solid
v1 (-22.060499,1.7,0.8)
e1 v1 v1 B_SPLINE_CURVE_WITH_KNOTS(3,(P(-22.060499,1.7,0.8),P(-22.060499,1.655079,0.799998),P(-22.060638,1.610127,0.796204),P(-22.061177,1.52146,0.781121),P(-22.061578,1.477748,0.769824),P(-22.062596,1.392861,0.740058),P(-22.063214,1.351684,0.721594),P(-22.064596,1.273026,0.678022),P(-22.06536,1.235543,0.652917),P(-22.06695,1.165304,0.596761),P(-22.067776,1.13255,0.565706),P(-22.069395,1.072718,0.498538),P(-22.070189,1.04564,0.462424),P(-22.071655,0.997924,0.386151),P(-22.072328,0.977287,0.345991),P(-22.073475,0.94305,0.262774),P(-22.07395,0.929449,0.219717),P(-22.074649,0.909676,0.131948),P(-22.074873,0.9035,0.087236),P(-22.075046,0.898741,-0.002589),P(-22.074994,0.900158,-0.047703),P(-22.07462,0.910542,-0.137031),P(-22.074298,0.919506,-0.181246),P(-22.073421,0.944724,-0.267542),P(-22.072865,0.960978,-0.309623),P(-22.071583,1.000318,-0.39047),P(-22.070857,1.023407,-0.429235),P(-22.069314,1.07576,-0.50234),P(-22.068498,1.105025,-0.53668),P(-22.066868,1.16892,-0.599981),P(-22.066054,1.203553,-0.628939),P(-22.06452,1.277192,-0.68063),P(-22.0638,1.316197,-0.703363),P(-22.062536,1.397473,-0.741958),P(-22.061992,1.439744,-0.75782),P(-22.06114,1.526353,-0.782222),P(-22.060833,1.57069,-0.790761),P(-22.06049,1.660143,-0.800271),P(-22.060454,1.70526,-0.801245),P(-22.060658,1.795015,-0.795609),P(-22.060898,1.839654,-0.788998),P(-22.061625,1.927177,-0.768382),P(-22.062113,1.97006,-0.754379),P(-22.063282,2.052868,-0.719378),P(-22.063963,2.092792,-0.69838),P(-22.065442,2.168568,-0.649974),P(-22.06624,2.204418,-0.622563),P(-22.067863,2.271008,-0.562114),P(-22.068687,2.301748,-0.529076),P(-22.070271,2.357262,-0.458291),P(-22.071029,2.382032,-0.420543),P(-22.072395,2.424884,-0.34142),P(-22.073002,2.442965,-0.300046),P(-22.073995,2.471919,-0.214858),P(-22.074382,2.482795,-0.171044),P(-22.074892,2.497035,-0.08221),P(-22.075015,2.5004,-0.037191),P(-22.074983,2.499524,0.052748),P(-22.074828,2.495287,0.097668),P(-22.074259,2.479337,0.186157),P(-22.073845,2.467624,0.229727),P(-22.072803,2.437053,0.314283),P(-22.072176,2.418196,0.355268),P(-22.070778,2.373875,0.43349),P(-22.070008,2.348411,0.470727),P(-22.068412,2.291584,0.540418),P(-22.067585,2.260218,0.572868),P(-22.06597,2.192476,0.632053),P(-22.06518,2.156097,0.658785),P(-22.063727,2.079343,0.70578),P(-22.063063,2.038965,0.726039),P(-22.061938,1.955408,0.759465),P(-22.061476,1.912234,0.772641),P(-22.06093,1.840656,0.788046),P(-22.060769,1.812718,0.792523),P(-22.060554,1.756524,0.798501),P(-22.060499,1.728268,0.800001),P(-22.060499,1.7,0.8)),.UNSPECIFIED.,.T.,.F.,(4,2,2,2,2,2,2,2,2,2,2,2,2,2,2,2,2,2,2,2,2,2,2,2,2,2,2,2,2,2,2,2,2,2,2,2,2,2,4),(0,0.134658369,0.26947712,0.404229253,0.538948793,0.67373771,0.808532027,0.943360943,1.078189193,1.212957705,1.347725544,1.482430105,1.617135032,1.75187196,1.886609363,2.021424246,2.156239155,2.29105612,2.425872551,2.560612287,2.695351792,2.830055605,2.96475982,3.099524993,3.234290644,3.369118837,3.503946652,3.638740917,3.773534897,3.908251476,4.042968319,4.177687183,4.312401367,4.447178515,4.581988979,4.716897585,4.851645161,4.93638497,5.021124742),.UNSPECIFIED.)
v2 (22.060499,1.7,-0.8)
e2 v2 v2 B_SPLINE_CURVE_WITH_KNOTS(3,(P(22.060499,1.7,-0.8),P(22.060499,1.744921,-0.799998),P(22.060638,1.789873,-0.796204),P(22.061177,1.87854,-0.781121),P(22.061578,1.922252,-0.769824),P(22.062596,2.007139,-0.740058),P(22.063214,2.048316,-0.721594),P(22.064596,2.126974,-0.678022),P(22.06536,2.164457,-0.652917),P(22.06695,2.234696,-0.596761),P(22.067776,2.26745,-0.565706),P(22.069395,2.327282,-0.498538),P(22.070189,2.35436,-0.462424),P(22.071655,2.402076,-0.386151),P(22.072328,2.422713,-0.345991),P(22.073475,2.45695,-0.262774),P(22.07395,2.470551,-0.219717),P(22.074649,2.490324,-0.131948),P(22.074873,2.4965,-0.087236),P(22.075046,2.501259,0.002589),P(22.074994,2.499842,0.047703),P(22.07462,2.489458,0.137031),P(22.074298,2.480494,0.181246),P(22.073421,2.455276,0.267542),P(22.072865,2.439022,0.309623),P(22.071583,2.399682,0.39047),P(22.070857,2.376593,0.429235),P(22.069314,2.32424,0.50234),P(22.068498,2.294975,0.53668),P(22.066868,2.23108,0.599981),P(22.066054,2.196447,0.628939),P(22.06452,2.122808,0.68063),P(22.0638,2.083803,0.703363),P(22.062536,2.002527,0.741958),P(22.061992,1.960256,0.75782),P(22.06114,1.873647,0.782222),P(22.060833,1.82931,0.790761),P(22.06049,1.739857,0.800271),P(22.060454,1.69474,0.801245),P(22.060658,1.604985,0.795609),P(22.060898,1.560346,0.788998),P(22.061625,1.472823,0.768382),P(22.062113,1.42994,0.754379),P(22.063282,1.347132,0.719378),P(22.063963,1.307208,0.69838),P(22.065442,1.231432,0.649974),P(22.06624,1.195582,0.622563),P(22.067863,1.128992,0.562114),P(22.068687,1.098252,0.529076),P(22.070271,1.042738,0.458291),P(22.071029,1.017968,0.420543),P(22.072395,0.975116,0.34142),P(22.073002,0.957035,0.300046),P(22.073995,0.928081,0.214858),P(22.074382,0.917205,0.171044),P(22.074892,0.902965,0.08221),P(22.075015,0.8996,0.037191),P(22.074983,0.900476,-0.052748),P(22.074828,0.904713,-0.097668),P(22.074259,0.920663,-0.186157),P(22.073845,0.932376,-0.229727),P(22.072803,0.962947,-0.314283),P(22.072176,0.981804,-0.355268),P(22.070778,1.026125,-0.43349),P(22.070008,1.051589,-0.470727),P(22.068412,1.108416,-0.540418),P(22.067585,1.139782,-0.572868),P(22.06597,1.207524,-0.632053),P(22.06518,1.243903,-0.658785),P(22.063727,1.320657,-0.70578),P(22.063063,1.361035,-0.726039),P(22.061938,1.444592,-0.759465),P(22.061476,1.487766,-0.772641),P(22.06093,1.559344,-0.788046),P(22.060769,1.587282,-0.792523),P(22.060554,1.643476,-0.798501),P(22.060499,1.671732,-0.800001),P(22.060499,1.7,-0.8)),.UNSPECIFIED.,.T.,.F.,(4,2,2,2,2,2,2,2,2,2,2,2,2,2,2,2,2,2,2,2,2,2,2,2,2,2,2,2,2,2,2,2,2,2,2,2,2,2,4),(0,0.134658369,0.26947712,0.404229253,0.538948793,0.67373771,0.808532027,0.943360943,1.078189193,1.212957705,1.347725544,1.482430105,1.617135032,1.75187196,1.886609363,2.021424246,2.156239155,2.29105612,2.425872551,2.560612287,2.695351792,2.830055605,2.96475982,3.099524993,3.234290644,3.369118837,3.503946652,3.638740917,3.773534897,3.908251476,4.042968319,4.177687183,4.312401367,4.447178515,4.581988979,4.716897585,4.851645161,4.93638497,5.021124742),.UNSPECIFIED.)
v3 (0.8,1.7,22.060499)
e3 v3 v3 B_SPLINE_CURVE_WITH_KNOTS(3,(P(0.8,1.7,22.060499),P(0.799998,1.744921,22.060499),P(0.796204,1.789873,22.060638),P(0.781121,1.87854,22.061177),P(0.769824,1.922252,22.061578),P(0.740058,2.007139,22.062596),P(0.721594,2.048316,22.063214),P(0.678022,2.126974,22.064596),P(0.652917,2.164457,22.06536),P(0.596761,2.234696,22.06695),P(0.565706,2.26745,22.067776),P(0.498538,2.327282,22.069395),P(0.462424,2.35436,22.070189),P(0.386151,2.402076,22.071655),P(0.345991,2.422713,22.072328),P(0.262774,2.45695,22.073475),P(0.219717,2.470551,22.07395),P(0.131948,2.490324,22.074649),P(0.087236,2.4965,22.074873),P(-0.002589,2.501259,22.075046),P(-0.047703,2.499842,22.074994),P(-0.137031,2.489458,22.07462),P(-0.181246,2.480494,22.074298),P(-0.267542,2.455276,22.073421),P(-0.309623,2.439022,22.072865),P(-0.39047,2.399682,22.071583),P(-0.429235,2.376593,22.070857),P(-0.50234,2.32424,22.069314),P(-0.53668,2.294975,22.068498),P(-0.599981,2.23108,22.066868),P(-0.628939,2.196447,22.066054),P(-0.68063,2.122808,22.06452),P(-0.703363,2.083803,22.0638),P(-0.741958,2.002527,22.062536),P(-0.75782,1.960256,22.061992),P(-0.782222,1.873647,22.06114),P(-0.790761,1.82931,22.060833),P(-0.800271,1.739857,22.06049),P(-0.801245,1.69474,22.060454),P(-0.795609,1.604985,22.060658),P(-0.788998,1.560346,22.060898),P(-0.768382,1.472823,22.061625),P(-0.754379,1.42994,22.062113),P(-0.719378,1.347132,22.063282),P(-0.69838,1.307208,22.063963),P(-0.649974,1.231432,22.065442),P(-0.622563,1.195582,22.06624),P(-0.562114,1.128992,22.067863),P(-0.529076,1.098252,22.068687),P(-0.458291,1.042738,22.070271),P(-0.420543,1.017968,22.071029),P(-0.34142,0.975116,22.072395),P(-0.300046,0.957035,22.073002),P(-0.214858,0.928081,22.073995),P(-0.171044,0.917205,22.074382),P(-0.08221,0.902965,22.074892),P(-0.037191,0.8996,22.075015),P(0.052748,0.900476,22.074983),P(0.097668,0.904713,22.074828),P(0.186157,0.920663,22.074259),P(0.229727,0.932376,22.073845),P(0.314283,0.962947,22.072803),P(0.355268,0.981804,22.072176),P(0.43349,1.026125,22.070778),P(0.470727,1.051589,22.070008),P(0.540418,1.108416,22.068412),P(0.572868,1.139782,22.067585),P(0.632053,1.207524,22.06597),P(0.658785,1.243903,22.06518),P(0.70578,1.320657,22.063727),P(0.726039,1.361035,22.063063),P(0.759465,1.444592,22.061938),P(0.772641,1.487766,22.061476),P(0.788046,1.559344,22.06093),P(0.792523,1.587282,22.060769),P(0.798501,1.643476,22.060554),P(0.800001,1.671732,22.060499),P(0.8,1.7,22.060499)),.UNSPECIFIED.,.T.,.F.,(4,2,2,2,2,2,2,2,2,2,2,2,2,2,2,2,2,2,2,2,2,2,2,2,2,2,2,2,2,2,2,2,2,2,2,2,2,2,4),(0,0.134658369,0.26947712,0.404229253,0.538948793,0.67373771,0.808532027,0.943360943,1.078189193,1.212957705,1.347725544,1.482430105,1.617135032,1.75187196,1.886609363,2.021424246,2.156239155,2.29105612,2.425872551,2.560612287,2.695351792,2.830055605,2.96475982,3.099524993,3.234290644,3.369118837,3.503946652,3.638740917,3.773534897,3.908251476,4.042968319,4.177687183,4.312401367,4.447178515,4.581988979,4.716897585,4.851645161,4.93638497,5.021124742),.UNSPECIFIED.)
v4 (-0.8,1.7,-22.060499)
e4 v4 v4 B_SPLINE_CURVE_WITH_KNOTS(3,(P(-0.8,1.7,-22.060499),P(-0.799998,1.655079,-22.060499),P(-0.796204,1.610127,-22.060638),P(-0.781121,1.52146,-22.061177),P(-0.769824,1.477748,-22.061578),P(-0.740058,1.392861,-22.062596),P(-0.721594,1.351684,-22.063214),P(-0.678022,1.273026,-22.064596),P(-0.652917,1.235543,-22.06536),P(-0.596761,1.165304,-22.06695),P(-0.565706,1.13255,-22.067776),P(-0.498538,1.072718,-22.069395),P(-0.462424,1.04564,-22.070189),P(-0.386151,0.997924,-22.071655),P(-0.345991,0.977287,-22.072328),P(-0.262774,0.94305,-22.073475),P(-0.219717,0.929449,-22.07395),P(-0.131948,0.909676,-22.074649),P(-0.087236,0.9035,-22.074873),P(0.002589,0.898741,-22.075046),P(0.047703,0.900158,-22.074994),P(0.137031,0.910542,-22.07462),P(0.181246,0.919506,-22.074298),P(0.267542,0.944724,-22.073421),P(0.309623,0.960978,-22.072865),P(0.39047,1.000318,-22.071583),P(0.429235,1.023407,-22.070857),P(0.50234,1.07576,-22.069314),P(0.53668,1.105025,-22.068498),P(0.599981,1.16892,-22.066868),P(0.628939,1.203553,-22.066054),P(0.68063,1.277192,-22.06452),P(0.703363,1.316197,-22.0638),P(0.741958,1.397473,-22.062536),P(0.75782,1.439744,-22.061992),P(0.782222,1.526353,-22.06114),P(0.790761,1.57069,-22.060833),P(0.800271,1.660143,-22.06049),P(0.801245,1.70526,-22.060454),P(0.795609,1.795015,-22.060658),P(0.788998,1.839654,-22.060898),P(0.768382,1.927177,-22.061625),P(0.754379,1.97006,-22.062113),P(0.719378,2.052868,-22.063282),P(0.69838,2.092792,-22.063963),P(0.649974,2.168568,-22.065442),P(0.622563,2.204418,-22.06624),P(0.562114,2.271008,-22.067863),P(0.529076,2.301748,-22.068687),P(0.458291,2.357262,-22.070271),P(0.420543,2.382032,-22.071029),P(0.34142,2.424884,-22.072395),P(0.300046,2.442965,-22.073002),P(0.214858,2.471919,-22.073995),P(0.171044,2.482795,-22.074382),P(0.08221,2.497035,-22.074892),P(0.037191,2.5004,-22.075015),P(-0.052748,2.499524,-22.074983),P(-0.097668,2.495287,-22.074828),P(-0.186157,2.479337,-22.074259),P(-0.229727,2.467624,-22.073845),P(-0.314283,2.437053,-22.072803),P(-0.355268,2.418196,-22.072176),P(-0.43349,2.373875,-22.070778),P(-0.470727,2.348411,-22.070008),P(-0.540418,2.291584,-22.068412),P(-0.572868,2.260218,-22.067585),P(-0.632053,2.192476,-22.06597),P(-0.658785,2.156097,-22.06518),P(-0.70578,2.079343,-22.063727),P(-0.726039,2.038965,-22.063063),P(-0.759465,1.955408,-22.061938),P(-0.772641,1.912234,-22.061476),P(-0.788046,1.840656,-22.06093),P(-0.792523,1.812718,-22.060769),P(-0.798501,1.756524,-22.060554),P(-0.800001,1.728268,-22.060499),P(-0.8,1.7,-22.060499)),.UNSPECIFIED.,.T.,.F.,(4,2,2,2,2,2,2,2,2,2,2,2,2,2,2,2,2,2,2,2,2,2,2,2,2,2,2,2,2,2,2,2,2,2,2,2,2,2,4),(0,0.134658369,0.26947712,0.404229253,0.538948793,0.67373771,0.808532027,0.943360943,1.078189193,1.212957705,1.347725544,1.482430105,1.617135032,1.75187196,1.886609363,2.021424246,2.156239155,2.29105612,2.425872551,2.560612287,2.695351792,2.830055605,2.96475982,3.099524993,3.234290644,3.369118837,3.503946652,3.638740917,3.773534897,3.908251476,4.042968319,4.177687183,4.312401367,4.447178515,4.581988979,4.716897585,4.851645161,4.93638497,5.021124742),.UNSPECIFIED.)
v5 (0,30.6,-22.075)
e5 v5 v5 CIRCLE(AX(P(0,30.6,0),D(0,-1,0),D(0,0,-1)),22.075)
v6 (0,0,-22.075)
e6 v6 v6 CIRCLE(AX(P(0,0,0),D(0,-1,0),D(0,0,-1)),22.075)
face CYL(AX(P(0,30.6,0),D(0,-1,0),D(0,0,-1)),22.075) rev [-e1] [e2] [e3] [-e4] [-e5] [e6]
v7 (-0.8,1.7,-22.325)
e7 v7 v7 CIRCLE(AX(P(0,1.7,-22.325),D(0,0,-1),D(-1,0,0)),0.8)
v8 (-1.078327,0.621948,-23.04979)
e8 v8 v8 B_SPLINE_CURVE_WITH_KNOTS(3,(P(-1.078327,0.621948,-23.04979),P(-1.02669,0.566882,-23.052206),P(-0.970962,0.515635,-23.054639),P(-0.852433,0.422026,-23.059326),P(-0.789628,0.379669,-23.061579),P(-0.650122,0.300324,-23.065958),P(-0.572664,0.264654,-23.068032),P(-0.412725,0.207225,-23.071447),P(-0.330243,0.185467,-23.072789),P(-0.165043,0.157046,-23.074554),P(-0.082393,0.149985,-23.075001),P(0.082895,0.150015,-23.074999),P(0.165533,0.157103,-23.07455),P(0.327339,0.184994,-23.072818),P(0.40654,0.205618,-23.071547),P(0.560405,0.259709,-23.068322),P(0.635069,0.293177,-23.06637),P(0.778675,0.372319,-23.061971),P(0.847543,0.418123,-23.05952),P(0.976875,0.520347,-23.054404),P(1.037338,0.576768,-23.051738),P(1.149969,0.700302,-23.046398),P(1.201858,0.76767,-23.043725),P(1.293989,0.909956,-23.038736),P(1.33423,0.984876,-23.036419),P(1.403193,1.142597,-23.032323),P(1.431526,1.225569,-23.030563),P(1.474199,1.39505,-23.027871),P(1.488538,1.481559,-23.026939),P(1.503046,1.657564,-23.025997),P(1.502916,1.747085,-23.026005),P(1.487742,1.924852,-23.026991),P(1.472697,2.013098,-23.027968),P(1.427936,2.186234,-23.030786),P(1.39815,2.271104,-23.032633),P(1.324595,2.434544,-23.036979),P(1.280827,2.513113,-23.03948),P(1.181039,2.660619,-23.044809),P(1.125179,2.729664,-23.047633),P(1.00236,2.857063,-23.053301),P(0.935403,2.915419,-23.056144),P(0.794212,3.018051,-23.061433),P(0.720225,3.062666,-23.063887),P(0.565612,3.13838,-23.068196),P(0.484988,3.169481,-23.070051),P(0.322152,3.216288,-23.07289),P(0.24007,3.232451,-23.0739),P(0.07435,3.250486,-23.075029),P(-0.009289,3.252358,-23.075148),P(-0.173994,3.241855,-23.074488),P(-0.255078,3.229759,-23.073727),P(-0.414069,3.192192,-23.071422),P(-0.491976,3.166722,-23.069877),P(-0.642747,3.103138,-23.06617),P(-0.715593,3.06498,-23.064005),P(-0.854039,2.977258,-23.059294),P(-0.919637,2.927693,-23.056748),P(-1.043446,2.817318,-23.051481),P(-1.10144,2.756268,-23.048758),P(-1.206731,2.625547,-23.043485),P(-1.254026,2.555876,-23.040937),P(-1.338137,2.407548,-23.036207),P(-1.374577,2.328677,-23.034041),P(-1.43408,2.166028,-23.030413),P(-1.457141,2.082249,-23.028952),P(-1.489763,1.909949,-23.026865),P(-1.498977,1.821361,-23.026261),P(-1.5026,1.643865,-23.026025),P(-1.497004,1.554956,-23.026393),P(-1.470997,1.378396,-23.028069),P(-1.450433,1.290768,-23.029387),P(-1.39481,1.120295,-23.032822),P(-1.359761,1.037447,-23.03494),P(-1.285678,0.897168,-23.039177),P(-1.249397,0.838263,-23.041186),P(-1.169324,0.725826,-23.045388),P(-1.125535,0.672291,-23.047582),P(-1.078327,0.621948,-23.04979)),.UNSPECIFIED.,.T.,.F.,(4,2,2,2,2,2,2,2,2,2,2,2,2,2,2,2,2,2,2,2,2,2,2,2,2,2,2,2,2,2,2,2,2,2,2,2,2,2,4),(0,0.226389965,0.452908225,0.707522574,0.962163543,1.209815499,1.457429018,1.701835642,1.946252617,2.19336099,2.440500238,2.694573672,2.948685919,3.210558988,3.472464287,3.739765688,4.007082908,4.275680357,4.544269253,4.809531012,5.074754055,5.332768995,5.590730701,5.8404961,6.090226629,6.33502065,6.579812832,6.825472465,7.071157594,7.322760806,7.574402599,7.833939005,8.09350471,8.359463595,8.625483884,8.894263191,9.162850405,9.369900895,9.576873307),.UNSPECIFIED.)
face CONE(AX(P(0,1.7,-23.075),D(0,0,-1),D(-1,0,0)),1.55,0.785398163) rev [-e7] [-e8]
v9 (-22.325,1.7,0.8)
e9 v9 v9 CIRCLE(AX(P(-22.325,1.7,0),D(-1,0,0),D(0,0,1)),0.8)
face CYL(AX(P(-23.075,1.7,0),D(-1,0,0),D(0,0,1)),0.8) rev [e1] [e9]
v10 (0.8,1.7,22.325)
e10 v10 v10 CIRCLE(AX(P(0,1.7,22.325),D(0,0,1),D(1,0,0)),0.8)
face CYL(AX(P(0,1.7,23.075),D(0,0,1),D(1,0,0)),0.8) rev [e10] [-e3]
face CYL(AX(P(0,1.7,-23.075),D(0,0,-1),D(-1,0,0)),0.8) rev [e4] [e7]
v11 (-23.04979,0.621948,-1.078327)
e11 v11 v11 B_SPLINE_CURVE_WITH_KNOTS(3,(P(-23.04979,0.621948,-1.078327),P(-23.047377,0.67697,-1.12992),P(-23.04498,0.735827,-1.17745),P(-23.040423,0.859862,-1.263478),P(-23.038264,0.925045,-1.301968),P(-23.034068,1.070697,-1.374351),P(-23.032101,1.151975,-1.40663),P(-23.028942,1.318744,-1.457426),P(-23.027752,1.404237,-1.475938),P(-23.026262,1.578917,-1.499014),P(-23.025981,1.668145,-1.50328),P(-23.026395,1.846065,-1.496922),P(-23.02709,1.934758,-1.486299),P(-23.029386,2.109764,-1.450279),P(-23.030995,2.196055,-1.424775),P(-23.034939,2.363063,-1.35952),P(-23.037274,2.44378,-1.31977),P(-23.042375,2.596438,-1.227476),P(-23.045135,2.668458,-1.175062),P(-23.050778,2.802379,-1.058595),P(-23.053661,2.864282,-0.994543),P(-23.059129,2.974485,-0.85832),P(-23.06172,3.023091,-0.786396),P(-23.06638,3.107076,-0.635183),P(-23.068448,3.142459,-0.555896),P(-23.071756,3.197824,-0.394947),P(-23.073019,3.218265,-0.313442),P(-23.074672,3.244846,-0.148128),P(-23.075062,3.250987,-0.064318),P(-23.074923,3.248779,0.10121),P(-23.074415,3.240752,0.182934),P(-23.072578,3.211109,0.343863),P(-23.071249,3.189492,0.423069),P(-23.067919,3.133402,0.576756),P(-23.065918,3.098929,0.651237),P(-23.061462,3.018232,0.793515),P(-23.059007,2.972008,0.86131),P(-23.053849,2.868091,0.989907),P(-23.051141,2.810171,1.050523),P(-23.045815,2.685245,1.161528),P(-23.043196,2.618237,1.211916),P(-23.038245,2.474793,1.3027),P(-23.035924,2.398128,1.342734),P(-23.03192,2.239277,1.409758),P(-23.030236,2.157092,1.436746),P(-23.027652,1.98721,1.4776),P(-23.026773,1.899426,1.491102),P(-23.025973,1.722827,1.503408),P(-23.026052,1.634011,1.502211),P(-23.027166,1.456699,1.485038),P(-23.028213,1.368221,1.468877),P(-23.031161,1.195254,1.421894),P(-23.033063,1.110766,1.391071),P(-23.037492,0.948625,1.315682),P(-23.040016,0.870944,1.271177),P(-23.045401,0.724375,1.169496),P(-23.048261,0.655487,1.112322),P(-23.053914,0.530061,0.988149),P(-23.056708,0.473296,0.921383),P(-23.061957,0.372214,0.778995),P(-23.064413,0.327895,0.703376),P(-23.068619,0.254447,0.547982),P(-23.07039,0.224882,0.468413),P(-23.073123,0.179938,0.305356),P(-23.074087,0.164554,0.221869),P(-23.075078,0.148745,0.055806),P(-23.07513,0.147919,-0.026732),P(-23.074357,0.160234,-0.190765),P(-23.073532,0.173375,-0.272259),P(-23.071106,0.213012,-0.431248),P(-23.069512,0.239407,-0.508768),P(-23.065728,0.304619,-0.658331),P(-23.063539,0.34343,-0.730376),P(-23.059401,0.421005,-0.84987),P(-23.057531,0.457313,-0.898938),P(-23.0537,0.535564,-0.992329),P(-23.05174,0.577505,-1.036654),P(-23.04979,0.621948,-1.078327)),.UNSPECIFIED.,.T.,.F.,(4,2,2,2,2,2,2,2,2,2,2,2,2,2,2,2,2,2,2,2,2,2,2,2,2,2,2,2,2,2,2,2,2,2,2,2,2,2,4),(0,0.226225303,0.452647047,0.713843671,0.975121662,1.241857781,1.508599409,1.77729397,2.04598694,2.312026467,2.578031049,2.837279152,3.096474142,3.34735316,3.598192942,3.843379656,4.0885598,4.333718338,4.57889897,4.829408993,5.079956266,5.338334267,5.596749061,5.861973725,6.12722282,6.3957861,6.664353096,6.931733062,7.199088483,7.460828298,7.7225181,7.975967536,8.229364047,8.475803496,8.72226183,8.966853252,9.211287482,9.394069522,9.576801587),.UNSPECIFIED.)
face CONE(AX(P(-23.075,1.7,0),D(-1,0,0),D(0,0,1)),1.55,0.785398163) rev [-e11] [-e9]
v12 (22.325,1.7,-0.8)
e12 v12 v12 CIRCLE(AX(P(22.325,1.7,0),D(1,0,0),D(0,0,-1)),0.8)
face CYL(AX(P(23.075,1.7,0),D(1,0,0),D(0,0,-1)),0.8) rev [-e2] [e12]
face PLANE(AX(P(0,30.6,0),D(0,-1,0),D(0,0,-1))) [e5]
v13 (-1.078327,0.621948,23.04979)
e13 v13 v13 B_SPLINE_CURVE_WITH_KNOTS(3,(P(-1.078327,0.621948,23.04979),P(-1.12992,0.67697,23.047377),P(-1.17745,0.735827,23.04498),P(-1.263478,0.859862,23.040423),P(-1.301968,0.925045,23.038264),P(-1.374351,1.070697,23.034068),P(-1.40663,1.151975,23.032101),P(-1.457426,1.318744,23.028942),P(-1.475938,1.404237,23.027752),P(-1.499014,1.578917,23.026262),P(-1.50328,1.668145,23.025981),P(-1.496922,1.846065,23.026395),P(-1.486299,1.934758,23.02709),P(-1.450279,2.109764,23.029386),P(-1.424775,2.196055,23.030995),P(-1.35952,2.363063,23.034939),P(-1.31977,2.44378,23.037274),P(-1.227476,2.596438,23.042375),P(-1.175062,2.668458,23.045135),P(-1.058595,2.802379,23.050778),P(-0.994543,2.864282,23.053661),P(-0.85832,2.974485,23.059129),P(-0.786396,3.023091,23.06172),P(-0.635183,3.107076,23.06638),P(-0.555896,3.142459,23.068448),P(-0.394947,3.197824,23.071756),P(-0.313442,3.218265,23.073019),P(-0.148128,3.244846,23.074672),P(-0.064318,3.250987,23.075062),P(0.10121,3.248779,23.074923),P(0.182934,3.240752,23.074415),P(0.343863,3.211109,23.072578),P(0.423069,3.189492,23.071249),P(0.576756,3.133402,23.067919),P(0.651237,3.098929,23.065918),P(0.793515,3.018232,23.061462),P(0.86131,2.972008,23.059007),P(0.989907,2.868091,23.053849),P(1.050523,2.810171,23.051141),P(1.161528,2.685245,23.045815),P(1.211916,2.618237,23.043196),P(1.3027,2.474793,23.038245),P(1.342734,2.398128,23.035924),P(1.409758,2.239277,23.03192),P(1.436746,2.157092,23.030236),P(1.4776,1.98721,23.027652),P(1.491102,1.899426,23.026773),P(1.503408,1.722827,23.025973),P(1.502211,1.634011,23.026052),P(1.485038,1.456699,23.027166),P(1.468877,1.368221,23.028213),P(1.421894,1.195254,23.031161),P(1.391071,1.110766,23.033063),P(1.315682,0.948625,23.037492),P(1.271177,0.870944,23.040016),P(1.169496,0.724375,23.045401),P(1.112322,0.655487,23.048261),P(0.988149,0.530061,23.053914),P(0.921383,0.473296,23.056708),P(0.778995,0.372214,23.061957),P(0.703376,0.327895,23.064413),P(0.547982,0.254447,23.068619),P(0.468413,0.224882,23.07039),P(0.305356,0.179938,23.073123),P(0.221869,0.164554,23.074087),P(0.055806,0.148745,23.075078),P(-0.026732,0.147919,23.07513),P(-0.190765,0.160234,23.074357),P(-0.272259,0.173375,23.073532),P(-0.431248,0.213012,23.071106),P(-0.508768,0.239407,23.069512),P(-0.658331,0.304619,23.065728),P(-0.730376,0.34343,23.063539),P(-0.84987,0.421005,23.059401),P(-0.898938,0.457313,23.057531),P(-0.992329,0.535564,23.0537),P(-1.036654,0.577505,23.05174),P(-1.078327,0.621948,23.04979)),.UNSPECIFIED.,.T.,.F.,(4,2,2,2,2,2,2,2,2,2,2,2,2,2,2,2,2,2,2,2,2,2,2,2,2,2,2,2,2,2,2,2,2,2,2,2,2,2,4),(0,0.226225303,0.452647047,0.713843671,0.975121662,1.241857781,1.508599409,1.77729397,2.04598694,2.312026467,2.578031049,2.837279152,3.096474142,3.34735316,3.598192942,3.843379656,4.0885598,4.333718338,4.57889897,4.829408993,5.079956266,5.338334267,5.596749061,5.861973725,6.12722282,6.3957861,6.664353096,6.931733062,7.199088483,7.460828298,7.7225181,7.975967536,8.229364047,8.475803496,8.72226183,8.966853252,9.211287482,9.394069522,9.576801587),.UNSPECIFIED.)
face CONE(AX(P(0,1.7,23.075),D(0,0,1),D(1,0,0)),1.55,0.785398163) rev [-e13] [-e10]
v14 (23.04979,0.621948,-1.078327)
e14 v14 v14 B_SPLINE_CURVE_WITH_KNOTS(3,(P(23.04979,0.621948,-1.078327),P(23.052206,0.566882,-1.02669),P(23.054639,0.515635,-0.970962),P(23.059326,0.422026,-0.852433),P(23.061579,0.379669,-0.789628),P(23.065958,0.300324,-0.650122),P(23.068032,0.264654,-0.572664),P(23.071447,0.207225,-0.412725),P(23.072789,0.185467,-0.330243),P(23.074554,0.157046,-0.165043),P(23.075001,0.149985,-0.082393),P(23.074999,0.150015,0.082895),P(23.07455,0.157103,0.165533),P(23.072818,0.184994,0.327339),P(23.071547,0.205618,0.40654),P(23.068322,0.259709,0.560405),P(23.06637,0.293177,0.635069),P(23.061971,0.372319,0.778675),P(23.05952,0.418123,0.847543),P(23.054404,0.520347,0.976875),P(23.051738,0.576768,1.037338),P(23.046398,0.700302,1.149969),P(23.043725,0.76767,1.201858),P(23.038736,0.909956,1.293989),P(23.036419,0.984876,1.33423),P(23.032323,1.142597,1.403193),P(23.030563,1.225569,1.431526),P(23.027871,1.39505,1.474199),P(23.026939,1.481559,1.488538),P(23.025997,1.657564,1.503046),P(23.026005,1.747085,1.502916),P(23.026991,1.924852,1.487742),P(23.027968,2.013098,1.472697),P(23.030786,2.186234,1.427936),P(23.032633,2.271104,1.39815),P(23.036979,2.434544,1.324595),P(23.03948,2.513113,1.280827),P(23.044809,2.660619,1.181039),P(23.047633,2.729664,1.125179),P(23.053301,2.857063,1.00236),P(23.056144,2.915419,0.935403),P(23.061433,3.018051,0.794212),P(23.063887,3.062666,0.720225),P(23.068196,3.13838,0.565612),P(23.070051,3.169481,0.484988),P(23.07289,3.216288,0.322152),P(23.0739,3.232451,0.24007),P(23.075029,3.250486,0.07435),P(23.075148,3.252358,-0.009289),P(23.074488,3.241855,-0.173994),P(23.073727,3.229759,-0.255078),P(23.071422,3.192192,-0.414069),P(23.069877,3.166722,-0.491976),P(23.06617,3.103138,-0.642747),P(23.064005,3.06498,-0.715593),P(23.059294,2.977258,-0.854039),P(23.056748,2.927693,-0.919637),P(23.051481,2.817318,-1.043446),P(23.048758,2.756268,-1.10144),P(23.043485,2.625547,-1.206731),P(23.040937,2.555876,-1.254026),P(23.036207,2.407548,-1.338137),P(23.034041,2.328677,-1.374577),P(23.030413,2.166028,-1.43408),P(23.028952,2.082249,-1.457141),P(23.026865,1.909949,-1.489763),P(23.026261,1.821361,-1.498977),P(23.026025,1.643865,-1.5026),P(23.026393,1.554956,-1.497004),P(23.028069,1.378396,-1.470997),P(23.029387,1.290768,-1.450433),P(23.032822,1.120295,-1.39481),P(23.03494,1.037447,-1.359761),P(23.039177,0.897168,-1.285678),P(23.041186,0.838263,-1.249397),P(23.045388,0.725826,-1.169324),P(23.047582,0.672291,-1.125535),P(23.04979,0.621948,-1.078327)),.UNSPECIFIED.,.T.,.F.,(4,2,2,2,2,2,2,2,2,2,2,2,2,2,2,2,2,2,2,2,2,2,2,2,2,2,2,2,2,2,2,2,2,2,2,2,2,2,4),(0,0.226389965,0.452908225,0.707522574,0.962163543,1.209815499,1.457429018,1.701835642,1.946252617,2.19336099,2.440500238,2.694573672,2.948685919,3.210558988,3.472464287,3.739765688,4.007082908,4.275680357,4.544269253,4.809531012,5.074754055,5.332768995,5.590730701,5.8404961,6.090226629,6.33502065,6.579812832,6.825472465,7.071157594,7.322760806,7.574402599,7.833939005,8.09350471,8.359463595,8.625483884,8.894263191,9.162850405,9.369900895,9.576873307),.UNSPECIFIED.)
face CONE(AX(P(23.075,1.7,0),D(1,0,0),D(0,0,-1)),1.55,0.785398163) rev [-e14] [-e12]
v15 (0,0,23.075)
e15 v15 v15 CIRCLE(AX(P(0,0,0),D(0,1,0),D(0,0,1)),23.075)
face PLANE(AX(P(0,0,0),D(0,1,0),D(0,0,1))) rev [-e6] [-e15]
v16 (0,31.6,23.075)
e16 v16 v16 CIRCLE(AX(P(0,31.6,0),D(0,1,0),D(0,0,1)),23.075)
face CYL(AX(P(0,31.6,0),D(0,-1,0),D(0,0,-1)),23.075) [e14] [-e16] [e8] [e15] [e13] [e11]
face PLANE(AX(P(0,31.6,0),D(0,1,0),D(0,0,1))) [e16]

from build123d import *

# Parameters (mm, degrees)
SKETCH3_R           = 23.075
BOSS_EXTRUDE3_DEPTH = 31.6
SKETCH4_R           = 22.075
CUT_EXTRUDE1_DEPTH  = 30.6
CIRPATTERN1_COUNT   = 4


# Read off the part's stored shape, not the designer's step: CSK for M2 Flat Head Machine Screw2
with BuildPart() as part:
    # Sketch3 → Boss-Extrude3 (new body)
    with BuildSketch(Plane(origin=(0, 0, 0), x_dir=(1, 0, 0), z_dir=(0, 1, 0))):
        with Locations(Location((0, 0, 0), (0, 0, 270))):
            Circle(SKETCH3_R)
    extrude(amount=BOSS_EXTRUDE3_DEPTH)

    # Sketch4 → Cut-Extrude1 (cut)
    with BuildSketch(Plane.XZ):
        with Locations(Location((0, 0, 0), (0, 0, 270))):
            Circle(SKETCH4_R)
    extrude(amount=-CUT_EXTRUDE1_DEPTH, mode=Mode.SUBTRACT)

    # CSK for M2 Flat Head Machine Screw2 outl → CSK for M2 Flat Head Machine Screw2 (revolve, cut)
    with BuildSketch(Plane(origin=(0, 1.7, 0), x_dir=(0, 1, 0), z_dir=(0, 0, -1))):
        Polygon((1.550011104, 23.075011104), (0, 23.075011104), (0, 22.060491405), (0.8, 22.060491405), (0.8, 22.325), align=None)
    csk_for_m2_flat_head_machine_screw2 = revolve(axis=Axis((0, 1.7, 0), (1, 0, 0)), mode=Mode.SUBTRACT)

    # CirPattern1: CSK for M2 Flat Head Machine Screw2 ×4 about axis
    cirpattern1_axis = Axis((0, 30.6, 0), (0, -1, 0))
    for i in range(1, CIRPATTERN1_COUNT):
        add(csk_for_m2_flat_head_machine_screw2.rotate(cirpattern1_axis, i * 360 / CIRPATTERN1_COUNT), mode=Mode.SUBTRACT)


solid = part.part
